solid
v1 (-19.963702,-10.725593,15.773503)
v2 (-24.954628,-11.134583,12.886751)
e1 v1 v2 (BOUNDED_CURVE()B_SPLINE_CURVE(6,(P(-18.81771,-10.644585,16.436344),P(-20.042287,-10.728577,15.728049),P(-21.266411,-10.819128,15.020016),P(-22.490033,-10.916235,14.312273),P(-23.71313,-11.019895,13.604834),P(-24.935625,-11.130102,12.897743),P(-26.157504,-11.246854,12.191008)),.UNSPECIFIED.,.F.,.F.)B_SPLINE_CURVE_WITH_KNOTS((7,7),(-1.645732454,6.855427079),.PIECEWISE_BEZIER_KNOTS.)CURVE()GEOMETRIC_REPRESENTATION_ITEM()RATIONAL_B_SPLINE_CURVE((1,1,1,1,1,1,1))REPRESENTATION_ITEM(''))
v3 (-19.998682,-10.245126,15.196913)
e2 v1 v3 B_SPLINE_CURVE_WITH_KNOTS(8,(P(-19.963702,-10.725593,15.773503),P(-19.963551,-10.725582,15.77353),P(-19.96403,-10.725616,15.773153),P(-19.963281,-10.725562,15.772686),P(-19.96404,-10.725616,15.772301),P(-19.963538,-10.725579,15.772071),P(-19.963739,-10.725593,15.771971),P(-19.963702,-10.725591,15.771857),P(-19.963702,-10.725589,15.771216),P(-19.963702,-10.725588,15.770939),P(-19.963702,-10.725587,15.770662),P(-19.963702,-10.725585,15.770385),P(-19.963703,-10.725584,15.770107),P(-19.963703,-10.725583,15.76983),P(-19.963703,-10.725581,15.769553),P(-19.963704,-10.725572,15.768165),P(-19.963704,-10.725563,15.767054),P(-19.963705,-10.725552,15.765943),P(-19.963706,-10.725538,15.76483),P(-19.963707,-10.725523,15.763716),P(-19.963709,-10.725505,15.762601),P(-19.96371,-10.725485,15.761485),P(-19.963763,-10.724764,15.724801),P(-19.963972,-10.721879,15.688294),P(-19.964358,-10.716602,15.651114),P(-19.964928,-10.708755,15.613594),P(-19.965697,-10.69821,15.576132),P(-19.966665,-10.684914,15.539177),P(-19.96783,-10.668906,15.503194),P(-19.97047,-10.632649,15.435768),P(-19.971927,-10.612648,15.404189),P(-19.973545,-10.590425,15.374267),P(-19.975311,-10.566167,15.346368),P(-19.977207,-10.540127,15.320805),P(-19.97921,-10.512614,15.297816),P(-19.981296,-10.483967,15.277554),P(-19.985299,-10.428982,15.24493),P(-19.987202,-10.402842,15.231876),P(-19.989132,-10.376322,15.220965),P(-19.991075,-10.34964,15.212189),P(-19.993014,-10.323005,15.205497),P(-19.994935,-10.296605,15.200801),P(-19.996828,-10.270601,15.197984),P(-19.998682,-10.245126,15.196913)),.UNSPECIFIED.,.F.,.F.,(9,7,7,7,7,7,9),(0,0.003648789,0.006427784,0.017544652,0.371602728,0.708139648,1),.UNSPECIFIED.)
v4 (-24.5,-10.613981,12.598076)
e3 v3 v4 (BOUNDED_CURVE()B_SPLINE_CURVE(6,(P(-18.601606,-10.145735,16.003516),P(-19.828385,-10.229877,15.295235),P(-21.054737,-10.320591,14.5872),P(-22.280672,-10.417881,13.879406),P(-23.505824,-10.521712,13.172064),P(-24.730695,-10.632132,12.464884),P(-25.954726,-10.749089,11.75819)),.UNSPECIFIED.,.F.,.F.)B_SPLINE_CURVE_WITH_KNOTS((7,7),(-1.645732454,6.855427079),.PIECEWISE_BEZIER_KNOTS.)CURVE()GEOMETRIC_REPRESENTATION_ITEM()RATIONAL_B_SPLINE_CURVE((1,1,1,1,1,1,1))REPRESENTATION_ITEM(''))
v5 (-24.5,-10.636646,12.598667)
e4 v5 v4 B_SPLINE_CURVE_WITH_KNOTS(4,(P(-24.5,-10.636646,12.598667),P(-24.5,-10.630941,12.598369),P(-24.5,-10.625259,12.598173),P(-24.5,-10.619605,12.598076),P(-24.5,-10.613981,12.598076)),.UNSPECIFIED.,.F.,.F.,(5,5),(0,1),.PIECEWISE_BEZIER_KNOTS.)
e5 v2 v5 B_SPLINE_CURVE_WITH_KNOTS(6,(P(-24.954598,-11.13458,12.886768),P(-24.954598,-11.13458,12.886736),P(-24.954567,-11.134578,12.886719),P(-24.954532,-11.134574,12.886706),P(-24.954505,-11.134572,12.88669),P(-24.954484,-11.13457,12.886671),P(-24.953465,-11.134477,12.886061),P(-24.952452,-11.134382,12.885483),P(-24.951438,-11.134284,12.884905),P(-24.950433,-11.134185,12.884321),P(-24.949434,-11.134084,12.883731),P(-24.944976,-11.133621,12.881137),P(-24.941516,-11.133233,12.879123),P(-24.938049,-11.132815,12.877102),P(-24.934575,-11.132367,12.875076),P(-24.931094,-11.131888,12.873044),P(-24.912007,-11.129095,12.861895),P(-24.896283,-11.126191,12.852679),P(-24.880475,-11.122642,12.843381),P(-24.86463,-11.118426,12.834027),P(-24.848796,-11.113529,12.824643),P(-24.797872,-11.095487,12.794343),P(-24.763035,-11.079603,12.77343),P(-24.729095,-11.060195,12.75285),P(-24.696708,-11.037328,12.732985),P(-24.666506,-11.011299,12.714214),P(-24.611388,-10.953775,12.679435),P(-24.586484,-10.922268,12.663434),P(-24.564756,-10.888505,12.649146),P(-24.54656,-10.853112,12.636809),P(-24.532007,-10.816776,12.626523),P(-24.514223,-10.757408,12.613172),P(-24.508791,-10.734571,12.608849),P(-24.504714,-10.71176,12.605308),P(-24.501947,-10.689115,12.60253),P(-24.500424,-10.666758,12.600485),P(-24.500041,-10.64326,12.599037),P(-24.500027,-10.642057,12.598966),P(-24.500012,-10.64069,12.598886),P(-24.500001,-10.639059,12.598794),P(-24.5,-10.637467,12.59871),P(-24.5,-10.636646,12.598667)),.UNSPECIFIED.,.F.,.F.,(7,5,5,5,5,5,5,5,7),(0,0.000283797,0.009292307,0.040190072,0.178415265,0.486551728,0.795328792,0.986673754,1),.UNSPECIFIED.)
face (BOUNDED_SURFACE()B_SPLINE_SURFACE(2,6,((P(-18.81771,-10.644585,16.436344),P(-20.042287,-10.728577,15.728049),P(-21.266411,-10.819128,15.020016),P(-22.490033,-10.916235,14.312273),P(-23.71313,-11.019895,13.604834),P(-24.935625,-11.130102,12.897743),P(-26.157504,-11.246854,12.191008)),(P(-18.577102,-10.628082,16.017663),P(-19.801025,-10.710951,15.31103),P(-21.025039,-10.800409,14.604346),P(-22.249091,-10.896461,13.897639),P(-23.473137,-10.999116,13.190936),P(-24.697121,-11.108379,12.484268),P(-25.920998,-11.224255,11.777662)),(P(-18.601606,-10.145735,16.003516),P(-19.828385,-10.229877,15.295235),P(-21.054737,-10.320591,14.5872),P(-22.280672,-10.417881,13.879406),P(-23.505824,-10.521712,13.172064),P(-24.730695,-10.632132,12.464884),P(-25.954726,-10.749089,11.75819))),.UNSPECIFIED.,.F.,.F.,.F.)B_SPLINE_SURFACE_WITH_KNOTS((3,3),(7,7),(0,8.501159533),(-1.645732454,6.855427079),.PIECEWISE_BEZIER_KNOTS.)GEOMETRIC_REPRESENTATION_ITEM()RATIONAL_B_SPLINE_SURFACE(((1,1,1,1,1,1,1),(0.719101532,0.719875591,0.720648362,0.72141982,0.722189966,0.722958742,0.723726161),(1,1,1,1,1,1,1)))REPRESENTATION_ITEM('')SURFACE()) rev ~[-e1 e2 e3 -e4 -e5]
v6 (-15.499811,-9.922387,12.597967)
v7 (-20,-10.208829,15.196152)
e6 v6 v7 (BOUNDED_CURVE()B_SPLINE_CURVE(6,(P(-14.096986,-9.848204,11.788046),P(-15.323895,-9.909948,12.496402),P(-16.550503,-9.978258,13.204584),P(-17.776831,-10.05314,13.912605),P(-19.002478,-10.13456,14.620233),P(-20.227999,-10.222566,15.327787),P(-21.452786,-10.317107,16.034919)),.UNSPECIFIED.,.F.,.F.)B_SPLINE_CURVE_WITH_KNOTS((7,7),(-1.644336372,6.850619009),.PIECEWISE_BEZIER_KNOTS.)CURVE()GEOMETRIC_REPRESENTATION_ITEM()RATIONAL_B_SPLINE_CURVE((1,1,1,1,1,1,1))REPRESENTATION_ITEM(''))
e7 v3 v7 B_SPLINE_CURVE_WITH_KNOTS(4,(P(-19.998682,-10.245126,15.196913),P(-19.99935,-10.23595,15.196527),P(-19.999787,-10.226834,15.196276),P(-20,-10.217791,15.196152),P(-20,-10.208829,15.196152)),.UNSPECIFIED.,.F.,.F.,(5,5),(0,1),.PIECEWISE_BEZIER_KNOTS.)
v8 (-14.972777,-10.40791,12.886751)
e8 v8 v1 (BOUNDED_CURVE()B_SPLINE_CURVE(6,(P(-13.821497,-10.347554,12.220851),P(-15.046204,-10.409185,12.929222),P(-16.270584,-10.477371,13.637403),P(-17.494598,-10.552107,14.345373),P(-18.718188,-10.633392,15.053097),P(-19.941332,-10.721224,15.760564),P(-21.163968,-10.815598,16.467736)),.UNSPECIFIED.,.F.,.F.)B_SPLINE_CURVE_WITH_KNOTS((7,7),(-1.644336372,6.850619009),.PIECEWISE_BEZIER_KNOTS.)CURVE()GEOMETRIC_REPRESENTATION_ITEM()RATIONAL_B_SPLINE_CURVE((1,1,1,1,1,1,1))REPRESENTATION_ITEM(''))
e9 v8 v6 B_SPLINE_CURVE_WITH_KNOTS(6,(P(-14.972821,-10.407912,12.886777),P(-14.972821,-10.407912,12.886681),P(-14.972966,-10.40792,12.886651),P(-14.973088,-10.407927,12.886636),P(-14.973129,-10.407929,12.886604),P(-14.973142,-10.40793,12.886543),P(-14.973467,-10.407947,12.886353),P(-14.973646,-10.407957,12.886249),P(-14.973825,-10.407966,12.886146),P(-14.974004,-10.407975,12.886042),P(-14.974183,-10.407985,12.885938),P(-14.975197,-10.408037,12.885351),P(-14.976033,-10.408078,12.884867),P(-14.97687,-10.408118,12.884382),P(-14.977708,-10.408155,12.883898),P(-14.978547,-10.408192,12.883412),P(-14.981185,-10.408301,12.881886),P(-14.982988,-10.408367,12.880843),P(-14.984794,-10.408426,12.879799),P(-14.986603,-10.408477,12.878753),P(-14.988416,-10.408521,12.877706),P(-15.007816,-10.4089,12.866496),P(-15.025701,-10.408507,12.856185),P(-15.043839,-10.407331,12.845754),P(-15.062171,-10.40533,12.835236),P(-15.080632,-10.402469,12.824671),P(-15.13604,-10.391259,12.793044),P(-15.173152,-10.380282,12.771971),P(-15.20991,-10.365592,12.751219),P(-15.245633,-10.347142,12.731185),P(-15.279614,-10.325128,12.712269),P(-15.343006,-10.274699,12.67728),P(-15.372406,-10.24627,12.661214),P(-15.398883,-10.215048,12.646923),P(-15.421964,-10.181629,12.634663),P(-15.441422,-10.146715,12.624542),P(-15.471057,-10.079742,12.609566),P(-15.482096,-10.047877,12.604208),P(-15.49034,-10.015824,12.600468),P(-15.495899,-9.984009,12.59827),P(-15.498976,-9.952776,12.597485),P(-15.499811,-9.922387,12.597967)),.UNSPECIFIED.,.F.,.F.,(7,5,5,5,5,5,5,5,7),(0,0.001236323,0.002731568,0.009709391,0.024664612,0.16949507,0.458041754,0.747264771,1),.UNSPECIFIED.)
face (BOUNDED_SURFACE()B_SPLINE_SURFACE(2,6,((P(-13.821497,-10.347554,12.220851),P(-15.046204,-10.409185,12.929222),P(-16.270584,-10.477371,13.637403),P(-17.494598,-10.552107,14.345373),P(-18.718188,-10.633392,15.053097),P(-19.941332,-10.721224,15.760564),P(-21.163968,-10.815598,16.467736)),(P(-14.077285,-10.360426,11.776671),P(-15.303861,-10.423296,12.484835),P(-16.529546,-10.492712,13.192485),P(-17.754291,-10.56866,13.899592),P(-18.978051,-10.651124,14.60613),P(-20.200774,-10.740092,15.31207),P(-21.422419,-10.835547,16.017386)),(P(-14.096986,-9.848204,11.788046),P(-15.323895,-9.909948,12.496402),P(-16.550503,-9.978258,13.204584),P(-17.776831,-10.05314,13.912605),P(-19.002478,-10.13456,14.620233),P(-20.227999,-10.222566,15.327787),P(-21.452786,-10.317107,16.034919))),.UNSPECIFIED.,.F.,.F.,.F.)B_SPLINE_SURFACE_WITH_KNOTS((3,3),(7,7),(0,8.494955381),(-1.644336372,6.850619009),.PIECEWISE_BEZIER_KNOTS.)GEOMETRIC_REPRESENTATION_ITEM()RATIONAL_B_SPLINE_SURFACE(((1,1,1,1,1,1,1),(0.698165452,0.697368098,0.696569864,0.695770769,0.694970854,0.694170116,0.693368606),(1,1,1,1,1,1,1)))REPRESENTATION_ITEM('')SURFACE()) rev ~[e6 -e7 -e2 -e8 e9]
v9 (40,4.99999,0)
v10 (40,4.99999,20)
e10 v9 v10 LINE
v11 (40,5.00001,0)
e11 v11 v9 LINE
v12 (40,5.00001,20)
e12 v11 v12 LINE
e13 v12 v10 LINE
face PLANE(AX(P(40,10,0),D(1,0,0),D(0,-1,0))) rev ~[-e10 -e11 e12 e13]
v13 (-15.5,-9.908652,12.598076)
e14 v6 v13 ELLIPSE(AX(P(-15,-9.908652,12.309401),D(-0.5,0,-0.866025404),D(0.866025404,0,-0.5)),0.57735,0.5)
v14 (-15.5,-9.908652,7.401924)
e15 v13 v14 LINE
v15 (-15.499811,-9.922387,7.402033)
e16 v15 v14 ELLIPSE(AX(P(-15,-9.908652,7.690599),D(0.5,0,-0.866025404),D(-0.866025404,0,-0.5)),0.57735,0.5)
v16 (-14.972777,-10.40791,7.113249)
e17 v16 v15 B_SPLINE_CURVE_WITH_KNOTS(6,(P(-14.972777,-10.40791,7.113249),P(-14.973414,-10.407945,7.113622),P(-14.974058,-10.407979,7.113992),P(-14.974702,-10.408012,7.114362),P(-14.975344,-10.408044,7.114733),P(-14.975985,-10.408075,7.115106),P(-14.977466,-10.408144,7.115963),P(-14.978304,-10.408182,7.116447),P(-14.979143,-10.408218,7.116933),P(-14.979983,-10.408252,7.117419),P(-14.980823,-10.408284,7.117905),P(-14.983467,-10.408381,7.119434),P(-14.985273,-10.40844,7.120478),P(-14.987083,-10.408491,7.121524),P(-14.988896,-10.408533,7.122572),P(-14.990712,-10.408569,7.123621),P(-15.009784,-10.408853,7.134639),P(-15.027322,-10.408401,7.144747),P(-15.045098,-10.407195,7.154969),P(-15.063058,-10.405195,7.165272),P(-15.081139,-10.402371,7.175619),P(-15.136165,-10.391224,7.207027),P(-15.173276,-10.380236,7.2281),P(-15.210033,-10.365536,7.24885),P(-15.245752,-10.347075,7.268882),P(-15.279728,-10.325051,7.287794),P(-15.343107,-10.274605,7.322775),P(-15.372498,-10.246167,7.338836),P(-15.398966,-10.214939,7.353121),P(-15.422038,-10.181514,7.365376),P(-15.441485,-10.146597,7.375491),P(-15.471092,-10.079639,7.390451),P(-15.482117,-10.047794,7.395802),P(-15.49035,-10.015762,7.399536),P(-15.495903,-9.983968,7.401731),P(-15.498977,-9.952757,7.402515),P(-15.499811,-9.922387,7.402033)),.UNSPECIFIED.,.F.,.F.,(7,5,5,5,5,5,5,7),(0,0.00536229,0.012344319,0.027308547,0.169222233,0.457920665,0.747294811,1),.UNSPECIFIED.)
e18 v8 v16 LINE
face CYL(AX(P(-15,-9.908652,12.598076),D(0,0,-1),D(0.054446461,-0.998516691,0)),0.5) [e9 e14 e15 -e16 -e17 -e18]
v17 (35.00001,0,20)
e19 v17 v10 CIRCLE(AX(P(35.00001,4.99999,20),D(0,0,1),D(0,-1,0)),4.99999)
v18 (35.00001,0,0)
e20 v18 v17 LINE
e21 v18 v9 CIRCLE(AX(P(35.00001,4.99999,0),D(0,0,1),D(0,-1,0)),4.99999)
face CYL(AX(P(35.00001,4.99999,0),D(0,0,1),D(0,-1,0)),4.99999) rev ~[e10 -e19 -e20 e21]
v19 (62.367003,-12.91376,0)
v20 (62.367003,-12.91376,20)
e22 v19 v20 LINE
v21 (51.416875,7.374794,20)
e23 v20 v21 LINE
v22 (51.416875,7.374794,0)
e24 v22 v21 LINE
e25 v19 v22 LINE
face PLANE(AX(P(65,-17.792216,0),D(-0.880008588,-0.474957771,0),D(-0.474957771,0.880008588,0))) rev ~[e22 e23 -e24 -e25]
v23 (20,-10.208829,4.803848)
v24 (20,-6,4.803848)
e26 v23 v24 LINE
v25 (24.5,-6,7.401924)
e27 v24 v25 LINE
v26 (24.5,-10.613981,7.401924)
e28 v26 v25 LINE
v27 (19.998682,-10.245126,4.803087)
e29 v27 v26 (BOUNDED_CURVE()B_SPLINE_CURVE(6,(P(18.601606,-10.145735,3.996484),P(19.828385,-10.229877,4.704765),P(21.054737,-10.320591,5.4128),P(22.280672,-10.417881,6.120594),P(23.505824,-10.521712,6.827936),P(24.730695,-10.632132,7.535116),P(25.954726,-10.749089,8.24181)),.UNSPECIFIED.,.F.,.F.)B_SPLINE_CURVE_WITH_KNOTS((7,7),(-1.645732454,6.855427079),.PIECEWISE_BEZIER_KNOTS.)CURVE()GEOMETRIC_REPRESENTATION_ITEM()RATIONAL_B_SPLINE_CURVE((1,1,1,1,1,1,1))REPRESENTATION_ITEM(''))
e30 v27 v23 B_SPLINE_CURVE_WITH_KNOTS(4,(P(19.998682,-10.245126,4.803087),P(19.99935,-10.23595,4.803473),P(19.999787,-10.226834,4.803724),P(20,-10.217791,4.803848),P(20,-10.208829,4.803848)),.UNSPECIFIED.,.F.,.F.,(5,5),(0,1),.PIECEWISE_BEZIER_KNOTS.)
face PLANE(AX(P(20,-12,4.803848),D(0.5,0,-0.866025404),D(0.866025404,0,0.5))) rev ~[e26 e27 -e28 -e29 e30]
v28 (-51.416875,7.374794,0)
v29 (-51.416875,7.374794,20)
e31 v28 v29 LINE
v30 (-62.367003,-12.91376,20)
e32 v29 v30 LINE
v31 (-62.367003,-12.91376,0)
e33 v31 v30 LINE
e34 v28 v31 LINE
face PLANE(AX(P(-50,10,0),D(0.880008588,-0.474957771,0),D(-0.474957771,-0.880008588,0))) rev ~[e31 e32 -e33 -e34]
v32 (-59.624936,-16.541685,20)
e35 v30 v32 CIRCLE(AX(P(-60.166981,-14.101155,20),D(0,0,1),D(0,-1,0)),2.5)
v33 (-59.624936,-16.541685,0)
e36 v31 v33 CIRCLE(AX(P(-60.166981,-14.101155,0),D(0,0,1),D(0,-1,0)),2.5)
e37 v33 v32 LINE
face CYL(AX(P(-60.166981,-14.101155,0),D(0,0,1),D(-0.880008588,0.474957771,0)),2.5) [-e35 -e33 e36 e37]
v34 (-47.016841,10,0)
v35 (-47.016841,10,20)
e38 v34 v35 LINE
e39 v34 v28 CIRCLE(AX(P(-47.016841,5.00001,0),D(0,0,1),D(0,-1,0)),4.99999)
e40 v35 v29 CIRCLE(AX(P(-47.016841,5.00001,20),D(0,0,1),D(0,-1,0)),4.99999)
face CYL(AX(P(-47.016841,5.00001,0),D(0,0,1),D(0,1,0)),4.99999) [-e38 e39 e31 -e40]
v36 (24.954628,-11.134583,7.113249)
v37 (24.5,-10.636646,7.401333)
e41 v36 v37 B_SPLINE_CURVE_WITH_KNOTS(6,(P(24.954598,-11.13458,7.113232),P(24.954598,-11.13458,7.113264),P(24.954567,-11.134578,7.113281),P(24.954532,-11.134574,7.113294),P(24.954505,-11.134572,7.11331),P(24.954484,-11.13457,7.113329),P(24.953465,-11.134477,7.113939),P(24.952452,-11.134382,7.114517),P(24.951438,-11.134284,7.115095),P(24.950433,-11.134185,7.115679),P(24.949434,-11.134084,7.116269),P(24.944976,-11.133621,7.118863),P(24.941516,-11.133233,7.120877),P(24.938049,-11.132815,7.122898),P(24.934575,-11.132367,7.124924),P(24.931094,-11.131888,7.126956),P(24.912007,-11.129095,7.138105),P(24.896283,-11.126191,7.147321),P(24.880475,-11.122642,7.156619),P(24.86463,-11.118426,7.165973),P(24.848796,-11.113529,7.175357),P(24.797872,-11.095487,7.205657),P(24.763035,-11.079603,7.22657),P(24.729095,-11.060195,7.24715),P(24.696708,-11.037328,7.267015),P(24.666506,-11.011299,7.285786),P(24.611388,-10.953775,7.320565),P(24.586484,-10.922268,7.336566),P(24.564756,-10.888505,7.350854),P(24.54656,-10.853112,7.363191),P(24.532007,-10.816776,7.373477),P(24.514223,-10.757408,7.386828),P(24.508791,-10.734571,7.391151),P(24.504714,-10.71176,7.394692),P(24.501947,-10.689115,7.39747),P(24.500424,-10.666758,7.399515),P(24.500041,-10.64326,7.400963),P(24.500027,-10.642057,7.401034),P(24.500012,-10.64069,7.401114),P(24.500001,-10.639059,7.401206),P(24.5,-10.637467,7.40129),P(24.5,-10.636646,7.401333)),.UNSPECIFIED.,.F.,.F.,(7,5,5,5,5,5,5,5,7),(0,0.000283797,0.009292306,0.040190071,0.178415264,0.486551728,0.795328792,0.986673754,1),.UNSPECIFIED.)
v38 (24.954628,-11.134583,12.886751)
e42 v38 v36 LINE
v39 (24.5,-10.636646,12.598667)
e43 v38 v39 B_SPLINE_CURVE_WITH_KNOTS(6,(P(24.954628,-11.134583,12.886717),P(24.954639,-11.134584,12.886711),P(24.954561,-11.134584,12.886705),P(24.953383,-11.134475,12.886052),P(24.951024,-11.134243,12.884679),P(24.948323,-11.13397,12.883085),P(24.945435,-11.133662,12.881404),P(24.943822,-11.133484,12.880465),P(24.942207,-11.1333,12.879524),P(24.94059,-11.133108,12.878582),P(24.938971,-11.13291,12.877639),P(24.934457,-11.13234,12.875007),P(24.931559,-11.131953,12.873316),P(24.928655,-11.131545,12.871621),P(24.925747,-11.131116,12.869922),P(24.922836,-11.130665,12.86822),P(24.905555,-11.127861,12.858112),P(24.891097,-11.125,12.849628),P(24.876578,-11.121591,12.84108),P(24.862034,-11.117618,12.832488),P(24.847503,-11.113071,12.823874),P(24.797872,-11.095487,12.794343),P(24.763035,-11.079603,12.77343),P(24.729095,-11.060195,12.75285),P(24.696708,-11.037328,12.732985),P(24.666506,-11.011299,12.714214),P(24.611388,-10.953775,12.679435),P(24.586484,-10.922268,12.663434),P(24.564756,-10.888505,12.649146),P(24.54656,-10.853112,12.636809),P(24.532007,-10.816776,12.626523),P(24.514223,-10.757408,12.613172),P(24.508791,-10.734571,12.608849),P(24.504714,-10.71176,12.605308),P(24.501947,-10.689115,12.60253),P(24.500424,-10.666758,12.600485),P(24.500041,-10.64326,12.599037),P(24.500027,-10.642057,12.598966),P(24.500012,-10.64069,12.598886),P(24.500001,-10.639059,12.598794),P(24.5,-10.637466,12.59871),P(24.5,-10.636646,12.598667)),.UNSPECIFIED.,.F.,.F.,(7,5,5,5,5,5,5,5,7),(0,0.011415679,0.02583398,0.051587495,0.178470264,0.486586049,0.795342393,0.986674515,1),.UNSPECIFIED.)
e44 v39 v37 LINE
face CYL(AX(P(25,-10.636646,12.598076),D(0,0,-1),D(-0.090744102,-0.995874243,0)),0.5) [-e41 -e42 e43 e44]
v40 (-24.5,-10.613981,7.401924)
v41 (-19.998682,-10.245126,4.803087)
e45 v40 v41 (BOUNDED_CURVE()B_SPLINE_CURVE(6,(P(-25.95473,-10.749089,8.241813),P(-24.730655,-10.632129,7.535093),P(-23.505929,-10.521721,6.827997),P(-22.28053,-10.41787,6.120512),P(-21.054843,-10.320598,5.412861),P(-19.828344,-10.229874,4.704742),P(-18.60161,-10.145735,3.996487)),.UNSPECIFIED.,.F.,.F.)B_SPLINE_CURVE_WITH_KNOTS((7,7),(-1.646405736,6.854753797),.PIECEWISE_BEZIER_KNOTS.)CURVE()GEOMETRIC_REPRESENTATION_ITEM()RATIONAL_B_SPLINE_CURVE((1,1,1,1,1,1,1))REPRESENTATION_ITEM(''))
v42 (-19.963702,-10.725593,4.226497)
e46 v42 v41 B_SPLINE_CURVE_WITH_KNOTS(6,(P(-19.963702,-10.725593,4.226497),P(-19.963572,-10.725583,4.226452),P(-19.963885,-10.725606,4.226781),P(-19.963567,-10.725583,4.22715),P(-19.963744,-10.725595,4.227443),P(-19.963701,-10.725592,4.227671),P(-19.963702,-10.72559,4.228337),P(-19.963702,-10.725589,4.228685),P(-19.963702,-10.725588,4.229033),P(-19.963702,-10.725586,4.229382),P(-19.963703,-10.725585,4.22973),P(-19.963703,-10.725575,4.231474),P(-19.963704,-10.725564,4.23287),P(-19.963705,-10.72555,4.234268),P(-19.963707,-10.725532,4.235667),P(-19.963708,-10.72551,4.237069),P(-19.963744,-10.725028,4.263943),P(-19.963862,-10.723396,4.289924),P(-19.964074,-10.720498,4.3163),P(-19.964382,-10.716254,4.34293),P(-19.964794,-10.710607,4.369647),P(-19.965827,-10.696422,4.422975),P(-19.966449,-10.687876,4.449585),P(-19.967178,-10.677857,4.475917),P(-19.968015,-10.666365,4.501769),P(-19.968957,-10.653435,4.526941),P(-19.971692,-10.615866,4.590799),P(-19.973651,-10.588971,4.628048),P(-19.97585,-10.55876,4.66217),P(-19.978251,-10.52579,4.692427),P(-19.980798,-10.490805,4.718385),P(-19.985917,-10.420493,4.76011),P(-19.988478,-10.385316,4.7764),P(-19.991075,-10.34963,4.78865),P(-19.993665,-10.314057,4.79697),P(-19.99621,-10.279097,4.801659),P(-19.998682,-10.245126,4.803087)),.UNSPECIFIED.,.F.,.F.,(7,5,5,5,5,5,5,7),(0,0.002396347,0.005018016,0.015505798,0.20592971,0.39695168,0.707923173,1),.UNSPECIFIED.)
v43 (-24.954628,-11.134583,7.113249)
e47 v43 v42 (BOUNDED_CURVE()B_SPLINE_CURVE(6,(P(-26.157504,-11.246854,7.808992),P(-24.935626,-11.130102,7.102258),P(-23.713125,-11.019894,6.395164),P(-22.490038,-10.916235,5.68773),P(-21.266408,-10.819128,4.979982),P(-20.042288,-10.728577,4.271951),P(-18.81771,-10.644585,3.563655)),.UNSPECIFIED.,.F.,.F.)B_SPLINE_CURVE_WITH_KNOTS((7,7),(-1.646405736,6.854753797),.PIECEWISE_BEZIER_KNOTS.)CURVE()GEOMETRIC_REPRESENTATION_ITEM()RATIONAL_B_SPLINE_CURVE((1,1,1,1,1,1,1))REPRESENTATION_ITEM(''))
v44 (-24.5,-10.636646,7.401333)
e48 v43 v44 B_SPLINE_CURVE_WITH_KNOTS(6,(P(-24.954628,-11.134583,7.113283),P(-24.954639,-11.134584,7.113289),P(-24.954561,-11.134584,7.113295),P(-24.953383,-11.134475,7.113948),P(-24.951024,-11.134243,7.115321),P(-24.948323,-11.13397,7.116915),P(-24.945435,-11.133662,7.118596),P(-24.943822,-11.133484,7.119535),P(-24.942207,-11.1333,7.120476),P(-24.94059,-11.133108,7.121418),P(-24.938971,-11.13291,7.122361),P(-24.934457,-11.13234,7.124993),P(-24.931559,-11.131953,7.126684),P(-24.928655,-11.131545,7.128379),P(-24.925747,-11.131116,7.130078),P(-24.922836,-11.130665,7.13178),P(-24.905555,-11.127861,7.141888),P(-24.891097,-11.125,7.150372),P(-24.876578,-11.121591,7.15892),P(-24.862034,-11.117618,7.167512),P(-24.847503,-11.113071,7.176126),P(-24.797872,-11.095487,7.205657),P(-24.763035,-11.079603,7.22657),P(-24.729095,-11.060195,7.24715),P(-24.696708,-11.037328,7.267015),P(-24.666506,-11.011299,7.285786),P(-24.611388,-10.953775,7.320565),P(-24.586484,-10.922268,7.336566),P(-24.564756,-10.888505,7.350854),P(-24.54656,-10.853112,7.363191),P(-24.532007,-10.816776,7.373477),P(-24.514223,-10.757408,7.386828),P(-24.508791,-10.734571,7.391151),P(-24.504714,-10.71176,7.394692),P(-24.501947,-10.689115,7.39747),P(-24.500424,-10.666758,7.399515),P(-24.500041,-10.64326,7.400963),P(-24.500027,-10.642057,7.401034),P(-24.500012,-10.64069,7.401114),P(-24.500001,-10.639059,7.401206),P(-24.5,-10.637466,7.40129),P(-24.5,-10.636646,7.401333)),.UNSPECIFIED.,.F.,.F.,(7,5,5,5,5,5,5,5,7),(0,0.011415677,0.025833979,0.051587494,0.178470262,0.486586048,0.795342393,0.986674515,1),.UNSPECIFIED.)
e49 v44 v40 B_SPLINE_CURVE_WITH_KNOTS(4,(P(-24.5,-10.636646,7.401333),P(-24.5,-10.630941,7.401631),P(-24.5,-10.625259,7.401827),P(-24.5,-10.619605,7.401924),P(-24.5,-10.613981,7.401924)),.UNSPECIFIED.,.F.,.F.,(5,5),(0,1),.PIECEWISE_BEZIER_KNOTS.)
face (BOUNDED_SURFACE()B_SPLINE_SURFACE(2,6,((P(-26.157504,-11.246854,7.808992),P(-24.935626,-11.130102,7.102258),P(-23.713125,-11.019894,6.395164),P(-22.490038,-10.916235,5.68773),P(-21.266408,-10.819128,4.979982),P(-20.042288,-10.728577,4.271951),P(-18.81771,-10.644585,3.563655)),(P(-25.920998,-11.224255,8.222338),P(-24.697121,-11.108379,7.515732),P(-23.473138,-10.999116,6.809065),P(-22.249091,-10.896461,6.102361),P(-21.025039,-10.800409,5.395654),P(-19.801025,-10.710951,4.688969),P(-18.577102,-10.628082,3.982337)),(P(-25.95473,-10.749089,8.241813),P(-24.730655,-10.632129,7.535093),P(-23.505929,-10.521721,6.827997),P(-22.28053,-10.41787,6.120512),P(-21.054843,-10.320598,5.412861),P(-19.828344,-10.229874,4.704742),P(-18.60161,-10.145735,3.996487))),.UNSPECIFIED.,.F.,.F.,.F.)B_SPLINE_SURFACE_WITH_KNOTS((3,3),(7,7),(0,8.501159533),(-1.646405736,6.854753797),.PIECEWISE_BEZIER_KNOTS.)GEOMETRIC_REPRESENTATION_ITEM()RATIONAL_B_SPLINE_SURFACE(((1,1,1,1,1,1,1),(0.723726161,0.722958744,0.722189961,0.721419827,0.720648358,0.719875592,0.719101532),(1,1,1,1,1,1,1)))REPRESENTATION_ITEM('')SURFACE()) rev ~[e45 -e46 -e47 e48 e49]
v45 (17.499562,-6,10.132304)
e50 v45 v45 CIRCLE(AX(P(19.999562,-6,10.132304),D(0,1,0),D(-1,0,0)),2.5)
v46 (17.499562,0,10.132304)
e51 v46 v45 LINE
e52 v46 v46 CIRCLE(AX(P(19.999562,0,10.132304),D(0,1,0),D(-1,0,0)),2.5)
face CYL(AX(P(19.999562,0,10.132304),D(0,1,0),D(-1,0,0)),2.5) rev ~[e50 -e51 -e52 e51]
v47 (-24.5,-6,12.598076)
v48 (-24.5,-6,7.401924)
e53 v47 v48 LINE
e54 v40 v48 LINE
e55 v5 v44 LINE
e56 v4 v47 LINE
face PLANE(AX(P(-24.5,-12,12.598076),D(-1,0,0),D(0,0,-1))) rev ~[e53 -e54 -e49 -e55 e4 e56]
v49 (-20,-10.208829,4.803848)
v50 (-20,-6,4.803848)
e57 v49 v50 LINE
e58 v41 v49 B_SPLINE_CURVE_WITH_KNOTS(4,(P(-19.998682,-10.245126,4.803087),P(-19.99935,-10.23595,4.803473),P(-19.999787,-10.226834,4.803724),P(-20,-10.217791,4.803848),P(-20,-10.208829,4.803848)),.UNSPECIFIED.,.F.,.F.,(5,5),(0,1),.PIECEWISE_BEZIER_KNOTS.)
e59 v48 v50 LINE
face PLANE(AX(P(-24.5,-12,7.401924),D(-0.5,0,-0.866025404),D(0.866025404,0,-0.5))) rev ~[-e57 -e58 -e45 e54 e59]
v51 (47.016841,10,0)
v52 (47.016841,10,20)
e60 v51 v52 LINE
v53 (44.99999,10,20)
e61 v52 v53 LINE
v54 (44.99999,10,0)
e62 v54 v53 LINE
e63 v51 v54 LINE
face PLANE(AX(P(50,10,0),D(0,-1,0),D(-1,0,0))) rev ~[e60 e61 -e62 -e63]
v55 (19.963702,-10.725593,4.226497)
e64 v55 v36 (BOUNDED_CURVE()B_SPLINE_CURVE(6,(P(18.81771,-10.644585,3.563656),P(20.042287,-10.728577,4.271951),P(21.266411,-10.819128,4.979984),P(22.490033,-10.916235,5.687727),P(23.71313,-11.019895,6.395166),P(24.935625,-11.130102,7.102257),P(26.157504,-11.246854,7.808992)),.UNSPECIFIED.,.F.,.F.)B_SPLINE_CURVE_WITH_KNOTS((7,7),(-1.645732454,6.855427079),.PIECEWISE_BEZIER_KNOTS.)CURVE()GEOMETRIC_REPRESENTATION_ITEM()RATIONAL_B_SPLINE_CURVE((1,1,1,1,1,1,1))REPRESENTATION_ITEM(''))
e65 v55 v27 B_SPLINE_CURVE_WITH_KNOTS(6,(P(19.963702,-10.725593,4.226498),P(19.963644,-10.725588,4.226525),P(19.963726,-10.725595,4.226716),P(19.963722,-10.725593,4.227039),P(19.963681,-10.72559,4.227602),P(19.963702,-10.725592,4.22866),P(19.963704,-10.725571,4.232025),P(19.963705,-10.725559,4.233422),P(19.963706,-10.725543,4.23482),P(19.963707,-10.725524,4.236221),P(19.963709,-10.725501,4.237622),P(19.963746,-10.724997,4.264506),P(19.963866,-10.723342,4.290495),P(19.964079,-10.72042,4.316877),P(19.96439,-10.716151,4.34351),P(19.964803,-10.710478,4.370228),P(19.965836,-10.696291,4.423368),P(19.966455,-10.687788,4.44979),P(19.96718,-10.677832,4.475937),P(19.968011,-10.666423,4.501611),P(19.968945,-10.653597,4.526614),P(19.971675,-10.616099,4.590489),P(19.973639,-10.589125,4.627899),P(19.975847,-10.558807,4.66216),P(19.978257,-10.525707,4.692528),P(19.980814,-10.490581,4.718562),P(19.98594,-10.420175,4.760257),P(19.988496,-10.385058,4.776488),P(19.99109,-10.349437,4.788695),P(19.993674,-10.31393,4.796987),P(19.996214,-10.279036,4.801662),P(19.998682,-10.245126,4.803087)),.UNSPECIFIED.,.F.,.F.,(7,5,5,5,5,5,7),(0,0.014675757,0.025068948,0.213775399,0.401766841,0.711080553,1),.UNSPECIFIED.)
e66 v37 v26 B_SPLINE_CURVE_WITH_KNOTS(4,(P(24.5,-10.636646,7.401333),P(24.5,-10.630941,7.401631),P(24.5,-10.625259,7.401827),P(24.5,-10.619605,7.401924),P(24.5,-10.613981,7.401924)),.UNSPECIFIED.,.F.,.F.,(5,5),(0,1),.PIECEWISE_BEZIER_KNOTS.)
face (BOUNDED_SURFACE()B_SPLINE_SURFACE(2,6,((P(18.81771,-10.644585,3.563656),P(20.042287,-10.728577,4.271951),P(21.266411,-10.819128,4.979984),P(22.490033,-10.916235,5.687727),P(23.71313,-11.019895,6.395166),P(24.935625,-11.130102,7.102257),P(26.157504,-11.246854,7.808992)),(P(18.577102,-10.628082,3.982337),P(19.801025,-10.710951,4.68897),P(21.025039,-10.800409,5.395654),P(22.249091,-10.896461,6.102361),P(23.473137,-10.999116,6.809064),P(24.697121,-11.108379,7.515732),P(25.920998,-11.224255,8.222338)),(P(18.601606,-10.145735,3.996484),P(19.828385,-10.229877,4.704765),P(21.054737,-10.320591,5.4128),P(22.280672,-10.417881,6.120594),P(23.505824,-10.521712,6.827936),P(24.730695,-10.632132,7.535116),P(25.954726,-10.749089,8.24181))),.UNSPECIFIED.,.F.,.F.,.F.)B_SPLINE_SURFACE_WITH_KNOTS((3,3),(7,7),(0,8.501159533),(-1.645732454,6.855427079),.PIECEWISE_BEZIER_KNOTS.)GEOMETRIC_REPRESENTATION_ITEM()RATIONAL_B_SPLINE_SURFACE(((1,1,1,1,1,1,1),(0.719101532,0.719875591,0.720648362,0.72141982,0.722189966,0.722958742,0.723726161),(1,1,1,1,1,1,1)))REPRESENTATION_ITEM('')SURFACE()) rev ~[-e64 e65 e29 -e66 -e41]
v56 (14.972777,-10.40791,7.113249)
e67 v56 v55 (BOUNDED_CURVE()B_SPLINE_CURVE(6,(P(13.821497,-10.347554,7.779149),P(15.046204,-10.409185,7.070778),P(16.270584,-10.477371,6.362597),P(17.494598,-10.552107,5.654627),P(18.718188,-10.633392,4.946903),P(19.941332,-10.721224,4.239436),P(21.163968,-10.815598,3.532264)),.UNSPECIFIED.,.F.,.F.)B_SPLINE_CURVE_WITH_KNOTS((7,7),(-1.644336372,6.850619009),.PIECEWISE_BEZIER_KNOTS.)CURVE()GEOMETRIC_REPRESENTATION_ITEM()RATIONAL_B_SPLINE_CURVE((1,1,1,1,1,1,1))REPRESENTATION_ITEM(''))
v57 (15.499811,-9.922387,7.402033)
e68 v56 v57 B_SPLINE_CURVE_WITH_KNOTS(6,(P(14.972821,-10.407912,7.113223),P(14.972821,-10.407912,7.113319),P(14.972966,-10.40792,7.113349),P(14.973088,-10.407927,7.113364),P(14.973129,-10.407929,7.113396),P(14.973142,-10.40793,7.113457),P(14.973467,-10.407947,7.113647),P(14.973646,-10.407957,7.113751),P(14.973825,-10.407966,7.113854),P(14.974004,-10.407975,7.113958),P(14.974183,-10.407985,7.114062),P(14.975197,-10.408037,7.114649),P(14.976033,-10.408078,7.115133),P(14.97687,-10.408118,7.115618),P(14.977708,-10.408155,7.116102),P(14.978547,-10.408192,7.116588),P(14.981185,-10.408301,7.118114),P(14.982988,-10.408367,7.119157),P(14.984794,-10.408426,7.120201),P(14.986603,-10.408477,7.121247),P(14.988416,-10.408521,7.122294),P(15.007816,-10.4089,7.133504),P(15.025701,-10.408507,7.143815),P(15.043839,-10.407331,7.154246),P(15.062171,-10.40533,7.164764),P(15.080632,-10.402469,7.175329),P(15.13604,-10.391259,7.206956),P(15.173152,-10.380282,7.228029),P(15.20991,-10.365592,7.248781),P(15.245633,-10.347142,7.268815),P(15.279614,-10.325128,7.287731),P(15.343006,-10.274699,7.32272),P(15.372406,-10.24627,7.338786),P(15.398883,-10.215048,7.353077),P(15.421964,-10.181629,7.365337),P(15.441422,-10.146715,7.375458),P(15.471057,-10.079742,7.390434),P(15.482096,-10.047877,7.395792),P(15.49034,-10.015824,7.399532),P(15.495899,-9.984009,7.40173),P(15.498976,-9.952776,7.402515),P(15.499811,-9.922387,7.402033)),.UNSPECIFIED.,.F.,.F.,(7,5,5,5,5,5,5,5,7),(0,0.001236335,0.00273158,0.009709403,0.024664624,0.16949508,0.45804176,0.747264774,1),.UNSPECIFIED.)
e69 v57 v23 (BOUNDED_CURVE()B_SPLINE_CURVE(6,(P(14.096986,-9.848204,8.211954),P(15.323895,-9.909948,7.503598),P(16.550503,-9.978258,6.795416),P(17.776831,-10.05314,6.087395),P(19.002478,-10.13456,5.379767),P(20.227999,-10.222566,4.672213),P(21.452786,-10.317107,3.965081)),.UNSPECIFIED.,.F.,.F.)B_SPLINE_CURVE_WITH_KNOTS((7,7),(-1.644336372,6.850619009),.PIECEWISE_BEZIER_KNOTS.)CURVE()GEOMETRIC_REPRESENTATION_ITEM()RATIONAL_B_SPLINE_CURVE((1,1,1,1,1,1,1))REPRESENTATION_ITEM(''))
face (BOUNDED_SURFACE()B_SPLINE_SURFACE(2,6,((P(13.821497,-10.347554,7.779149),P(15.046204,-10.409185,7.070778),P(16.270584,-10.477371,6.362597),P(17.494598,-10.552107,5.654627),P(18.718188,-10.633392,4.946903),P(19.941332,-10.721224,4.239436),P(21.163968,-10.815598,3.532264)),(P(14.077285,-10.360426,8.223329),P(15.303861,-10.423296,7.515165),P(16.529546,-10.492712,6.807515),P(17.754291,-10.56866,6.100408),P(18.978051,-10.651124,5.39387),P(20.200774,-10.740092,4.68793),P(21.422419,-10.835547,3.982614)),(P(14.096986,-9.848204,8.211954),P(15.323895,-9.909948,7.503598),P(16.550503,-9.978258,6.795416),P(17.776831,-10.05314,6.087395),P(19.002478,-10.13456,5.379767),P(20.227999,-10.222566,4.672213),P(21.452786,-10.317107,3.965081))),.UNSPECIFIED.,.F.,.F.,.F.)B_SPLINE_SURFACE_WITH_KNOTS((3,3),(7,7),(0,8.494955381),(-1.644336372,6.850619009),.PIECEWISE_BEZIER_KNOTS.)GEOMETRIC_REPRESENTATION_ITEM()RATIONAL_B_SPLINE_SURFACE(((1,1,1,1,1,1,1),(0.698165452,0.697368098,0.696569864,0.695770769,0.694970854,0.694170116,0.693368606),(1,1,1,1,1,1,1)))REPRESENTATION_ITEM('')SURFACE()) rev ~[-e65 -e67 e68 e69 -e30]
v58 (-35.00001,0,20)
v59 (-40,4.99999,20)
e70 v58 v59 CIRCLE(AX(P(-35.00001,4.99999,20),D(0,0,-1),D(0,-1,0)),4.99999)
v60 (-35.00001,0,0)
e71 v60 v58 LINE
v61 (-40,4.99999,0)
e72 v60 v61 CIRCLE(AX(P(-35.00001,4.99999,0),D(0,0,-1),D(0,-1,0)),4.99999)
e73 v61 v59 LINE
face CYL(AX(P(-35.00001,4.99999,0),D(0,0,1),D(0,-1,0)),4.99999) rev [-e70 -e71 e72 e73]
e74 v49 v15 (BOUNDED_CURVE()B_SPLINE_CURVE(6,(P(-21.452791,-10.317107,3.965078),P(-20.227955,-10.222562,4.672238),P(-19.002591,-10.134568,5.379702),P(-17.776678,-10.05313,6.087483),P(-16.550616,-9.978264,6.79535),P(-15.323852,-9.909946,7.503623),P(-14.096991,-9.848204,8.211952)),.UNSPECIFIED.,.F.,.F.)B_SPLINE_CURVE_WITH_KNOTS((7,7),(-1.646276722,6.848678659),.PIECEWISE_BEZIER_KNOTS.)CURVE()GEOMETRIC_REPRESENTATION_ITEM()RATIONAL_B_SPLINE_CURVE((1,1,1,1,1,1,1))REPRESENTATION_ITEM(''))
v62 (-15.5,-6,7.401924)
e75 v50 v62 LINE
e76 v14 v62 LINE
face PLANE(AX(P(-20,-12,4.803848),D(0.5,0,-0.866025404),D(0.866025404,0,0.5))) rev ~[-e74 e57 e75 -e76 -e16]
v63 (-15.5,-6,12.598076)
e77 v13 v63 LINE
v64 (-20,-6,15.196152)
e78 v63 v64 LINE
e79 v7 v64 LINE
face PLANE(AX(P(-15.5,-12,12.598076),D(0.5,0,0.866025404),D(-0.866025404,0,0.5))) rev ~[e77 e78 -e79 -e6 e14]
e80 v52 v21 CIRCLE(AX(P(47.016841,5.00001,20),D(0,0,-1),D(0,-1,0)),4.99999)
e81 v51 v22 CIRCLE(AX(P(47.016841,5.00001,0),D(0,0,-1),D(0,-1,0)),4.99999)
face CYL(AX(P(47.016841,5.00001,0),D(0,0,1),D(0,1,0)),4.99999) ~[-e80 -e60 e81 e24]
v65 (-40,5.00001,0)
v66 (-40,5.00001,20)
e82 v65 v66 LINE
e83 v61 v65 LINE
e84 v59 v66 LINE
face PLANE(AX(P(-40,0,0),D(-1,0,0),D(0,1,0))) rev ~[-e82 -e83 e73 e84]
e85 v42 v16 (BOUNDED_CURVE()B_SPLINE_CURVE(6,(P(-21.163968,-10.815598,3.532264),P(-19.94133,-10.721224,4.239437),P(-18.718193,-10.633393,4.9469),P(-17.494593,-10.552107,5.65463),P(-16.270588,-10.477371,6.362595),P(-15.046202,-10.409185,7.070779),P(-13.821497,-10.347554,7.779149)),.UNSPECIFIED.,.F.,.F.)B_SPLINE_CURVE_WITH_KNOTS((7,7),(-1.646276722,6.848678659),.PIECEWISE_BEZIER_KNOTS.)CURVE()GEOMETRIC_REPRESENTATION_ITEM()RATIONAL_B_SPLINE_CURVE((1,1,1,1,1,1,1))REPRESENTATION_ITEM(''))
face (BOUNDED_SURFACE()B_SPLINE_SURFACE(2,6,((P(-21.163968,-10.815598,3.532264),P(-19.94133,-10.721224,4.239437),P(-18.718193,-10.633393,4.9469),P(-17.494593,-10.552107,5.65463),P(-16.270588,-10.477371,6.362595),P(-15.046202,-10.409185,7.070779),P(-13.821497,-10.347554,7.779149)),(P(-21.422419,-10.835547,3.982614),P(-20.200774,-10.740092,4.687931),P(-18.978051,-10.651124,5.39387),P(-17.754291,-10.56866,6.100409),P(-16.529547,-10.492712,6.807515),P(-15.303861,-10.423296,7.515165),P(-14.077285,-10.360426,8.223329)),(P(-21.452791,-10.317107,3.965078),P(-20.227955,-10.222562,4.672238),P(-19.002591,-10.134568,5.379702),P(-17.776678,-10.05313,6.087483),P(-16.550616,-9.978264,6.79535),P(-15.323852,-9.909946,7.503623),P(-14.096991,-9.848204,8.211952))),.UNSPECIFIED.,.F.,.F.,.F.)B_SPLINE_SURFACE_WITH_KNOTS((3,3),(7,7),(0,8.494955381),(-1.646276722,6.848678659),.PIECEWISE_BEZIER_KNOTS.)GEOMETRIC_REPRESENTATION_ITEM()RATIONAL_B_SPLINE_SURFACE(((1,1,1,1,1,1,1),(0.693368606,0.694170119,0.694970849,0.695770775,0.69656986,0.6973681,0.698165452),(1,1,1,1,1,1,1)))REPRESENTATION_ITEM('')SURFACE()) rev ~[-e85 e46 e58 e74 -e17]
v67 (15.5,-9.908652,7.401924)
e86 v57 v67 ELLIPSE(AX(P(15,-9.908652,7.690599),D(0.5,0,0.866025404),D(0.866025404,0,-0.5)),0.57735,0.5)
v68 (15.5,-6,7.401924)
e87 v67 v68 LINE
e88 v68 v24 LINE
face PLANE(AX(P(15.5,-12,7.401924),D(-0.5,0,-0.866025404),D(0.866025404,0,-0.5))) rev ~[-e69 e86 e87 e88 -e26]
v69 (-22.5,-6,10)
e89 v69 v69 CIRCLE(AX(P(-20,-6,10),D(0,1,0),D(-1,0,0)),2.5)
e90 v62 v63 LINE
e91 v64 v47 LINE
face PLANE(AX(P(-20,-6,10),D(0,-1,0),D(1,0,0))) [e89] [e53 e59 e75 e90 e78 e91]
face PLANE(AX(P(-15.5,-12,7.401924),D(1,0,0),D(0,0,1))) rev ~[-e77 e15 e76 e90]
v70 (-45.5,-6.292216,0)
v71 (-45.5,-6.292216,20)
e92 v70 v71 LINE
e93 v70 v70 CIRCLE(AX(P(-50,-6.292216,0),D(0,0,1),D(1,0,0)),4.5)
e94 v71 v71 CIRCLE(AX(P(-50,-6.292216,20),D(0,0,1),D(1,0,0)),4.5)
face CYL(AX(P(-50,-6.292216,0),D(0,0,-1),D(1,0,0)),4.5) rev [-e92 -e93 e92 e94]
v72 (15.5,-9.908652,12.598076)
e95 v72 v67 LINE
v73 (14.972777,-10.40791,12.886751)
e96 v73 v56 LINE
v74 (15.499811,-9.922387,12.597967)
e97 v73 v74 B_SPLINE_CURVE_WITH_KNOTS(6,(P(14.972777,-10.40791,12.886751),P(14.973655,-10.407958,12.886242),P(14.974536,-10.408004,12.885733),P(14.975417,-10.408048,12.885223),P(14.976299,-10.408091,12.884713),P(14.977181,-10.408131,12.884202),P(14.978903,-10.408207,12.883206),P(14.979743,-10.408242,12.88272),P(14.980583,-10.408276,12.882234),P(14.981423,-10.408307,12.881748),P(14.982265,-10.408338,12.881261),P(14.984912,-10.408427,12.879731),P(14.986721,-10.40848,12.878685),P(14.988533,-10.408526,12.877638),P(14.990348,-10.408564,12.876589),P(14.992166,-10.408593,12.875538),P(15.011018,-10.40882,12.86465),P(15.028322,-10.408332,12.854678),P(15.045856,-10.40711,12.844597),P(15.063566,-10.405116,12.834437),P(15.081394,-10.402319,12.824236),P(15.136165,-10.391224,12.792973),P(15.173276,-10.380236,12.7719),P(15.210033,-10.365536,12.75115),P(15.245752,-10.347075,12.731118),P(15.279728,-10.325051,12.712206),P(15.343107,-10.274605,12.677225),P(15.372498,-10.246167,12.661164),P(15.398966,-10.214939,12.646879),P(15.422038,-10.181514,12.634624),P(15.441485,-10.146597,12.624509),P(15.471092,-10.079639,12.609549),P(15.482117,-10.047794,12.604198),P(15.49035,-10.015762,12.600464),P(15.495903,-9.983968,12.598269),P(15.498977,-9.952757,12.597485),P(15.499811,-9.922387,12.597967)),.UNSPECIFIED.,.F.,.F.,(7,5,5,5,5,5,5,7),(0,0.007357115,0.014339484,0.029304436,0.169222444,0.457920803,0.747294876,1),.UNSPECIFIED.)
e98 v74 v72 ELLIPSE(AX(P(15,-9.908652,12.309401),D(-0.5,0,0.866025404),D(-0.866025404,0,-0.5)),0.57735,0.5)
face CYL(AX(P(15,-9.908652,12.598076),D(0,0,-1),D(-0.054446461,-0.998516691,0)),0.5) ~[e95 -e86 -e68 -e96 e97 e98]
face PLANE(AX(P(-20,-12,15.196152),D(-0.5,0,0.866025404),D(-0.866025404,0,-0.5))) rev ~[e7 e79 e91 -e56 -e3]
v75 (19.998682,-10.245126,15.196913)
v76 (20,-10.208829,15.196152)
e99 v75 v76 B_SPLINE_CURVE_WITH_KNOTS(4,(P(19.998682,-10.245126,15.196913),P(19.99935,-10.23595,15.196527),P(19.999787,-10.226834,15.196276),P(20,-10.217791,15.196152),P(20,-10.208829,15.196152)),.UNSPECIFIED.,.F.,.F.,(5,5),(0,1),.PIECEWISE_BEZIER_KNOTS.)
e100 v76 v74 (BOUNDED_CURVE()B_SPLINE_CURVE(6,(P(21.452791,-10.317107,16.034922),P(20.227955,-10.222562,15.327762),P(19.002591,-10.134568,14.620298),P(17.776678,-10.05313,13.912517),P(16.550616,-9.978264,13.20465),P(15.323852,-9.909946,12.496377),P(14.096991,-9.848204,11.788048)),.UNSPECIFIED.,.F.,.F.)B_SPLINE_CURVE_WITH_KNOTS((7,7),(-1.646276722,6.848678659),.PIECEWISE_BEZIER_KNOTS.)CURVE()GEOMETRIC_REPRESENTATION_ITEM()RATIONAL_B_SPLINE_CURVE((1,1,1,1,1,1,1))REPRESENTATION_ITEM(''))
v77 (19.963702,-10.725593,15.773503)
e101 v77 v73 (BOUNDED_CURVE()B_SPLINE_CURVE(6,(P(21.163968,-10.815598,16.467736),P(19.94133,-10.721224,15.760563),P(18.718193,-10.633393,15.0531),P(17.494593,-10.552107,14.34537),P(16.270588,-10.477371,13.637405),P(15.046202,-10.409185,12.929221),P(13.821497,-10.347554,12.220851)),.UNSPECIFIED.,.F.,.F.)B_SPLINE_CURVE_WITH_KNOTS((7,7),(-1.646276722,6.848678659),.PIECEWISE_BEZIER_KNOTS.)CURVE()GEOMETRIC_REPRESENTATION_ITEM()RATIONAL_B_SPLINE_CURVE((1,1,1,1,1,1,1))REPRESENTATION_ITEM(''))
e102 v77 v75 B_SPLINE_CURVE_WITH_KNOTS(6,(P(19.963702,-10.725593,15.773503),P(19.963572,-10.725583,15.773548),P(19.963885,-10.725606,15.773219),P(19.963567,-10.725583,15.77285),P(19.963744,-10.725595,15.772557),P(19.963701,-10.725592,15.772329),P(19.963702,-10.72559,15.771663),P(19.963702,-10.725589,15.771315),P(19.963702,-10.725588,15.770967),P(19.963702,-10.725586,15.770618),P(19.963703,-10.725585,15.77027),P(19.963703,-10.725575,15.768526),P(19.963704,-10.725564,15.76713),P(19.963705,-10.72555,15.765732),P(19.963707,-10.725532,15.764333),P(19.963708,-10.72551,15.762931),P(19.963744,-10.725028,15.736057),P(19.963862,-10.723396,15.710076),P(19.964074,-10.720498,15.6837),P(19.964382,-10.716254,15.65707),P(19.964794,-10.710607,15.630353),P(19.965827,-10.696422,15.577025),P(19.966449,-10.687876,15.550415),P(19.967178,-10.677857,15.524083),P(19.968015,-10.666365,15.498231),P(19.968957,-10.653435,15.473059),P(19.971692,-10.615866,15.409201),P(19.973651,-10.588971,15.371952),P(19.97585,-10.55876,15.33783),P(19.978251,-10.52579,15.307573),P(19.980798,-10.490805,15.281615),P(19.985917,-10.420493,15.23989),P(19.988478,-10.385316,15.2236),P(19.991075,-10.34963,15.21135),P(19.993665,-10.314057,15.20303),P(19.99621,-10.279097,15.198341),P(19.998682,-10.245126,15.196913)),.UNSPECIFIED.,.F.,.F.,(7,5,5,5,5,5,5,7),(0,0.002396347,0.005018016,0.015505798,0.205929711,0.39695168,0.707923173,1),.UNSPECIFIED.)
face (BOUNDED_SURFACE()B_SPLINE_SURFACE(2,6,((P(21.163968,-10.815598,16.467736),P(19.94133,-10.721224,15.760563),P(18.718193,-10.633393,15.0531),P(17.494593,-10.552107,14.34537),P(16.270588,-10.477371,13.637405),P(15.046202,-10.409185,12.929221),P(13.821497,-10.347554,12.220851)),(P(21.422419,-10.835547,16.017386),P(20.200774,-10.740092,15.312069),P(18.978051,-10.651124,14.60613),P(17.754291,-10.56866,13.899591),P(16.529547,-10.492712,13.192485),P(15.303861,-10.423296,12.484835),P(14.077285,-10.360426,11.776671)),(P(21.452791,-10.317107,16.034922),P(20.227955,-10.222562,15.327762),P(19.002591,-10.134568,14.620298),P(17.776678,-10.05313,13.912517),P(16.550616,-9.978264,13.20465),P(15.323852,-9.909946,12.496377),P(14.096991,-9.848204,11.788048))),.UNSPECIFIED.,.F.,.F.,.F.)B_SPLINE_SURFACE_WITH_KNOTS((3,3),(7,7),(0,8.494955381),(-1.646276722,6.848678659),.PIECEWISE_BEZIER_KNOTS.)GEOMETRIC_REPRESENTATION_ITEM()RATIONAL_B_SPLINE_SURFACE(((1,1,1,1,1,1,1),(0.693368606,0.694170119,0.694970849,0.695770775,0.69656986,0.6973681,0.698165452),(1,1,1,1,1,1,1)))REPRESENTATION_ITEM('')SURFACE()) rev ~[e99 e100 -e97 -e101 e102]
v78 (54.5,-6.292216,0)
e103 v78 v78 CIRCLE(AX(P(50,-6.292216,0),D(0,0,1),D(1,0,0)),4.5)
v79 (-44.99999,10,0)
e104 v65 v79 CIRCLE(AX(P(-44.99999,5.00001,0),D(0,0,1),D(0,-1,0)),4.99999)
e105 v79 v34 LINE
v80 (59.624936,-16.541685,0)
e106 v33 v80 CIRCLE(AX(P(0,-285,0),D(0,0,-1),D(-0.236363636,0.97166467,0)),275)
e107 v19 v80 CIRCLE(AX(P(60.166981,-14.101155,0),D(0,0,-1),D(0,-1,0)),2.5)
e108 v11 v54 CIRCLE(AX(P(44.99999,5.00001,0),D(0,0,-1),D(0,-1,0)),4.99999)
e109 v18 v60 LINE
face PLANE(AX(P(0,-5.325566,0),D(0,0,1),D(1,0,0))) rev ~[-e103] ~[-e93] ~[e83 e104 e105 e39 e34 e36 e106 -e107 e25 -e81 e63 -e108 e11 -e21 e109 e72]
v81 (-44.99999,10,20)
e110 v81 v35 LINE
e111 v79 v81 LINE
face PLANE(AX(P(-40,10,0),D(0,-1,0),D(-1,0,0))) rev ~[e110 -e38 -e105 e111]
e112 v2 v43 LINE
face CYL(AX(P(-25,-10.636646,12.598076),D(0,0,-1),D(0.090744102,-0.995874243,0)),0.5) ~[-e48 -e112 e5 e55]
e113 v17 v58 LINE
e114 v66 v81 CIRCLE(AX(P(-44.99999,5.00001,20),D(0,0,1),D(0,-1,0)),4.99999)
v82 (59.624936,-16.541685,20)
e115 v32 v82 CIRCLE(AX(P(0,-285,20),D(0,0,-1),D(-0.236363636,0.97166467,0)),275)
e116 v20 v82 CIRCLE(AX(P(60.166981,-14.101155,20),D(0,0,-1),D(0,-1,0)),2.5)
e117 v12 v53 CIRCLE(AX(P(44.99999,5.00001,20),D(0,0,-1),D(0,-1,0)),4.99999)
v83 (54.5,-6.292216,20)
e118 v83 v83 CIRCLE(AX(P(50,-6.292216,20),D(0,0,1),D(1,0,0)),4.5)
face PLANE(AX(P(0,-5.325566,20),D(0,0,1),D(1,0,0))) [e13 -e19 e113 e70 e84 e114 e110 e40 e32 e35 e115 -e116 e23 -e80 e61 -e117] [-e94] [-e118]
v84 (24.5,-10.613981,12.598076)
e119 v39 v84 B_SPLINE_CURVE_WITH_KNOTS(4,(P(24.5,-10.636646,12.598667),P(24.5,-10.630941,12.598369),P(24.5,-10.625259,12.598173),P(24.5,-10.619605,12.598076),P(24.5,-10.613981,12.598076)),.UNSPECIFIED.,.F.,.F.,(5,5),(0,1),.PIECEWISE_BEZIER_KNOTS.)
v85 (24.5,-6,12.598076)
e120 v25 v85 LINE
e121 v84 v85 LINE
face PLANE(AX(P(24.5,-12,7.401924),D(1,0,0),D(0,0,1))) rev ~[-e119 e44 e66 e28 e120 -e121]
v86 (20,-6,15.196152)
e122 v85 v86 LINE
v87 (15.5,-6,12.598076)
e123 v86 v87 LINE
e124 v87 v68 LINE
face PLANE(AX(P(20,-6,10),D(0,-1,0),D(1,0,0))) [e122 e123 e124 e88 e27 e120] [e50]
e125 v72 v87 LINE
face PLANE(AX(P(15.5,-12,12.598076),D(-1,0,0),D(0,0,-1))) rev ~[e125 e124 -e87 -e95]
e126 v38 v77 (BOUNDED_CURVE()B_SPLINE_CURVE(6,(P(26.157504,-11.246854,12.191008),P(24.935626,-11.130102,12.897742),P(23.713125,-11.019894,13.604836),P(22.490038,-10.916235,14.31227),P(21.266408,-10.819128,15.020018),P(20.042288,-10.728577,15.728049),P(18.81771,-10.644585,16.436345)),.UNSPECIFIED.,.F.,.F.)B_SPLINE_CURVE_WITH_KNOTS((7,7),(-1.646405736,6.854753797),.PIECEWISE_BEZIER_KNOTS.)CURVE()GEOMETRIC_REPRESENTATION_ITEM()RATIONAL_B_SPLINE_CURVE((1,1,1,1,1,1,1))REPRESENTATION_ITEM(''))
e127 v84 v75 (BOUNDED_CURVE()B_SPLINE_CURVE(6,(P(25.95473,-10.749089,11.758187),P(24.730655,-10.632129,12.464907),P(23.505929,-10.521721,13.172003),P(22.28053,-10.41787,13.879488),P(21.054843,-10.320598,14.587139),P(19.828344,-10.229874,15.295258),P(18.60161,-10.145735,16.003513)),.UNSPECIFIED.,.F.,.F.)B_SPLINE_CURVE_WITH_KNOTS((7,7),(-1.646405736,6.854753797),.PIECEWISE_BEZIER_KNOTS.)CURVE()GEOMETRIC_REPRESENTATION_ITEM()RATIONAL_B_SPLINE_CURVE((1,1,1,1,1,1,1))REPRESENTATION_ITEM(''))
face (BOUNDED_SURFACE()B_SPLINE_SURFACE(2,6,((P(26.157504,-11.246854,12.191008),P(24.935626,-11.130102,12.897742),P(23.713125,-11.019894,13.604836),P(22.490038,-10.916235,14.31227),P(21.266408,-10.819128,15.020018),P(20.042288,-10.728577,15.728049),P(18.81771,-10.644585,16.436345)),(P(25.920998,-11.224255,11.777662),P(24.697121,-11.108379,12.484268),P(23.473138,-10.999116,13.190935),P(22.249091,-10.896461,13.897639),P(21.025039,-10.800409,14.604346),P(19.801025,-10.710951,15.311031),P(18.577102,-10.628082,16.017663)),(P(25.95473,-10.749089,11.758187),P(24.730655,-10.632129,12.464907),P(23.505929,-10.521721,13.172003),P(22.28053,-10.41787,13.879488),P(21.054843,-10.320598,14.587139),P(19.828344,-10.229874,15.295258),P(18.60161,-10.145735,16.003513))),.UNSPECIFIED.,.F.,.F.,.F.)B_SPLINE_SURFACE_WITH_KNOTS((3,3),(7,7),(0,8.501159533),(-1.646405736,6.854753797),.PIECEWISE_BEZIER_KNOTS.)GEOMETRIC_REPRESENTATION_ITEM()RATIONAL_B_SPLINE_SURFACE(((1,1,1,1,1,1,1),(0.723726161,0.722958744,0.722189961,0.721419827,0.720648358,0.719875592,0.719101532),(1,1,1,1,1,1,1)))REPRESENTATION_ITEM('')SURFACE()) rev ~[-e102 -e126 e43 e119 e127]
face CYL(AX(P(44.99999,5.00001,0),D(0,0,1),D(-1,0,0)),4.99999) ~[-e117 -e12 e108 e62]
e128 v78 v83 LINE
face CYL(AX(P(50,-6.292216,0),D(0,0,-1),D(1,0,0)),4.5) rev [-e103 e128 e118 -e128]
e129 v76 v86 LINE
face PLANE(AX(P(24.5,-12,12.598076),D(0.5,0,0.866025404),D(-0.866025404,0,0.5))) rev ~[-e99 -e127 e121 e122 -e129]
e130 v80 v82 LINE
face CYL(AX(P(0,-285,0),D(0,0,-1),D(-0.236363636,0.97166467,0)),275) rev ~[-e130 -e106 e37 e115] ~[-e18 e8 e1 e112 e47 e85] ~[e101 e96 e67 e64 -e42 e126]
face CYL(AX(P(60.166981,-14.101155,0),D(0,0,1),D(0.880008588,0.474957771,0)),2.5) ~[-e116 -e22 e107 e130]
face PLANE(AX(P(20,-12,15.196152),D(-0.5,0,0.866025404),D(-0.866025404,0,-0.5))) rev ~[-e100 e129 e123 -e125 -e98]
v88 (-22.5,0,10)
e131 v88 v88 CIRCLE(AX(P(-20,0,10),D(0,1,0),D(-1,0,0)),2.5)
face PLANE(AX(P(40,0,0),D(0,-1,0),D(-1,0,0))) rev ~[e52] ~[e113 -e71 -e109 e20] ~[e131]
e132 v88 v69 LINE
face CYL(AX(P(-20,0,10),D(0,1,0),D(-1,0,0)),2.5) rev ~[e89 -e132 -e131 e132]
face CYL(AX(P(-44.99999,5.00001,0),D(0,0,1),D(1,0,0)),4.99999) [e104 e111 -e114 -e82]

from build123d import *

# Parameters (mm, degrees)
F0_R     = 4.5
F1_DEPTH = 20
F2_R     = 4.99999
F3_R     = 2.5
F4_R     = 2.5
F5_DEPTH = 25
F8_DEPTH = 6
F9_R     = 0.5


# Not quite as in the source:
# - a fillet or chamfer is up to 0.001 mm smaller than in the source, because OpenCascade refuses the exact size
# - a feature names something its author has since deleted; it is built from what else it names


with BuildPart() as f1:
    # F0 (on Top) → F1 (new body)
    with BuildSketch(Plane.XY):
        with BuildLine():
            Line((40, 0), (-40, 0))
            Line((-40, 0), (-40, 10))
            Line((-40, 10), (-50, 10))
            Line((-50, 10), (-65, -17.7922156823))
            ThreePointArc((-65, -17.7922156823), (0, -10), (65, -17.7922156823))
            Line((65, -17.7922156823), (50, 10))
            Line((50, 10), (40, 10))
            Line((40, 10), (40, 0))
        make_face()
        with Locations((-50, -6.2922156823)):
            Circle(F0_R, mode=Mode.SUBTRACT)
        with Locations((50, -6.2922156823)):
            Circle(F0_R, mode=Mode.SUBTRACT)
    extrude(amount=F1_DEPTH)

    # F2 (radius 5 in the source; OpenCascade refuses exactly that, so slightly less here)
    f2_edges = [f1.edges().sort_by_distance(p)[0] for p in [
        (-40, 10, 10),
        (-40, 0, 10),
        (40, 10, 10),
        (40, 0, 10),
        (-50, 10, 10),
        (50, 10, 10),
    ]]
    fillet(f2_edges, radius=F2_R)

    # F3
    f3_edges = [f1.edges().sort_by_distance(p)[0] for p in [
        (-65, -17.792216, 10),
        (65, -17.792216, 10),
    ]]
    fillet(f3_edges, radius=F3_R)

    # F4 (on face) → F5 (cut)
    with BuildSketch(Plane(origin=(0, 0, 0), x_dir=(-1, 0, 0), z_dir=(0, 1, 0))):
        with Locations((-19.9995623863, 10.1323040371)):
            Circle(F4_R)
        with Locations((20, 10)):
            Circle(F4_R)
    extrude(amount=-F5_DEPTH, mode=Mode.SUBTRACT)

    # F7 (on offset) → F8 (cut)
    with BuildSketch(Plane.XZ.offset(12)):
        Polygon((-15.5, 7.4019237886), (-15.5, 12.5980762114), (-20, 15.1961524227), (-24.5, 12.5980762114), (-24.5, 7.4019237886), (-20, 4.8038475773), align=None)
        Polygon((15.5, 12.5980762114), (15.5, 7.4019237886), (20, 4.8038475773), (24.5, 7.4019237886), (24.5, 12.5980762114), (20, 15.1961524227), align=None)
    extrude(amount=-F8_DEPTH, mode=Mode.SUBTRACT)

    # F9
    f9_edges = [f1.edges().sort_by_distance(p)[0] for p in [
        (-22.250563, -10.901637, 13.896789),
        (-24.5, -11.093538, 10),
        (-22.250563, -10.901637, 6.103211),
        (-17.750448, -10.573468, 6.102627),
        (-15.5, -10.437166, 10),
        (-17.750448, -10.573468, 13.897373),
        (17.750448, -10.573468, 13.897373),
        (15.5, -10.437166, 10),
        (17.750448, -10.573468, 6.102627),
        (22.250563, -10.901637, 6.103211),
        (24.5, -11.093538, 10),
        (22.250563, -10.901637, 13.896789),
    ]]
    fillet(f9_edges, radius=F9_R)


solid = f1.part
